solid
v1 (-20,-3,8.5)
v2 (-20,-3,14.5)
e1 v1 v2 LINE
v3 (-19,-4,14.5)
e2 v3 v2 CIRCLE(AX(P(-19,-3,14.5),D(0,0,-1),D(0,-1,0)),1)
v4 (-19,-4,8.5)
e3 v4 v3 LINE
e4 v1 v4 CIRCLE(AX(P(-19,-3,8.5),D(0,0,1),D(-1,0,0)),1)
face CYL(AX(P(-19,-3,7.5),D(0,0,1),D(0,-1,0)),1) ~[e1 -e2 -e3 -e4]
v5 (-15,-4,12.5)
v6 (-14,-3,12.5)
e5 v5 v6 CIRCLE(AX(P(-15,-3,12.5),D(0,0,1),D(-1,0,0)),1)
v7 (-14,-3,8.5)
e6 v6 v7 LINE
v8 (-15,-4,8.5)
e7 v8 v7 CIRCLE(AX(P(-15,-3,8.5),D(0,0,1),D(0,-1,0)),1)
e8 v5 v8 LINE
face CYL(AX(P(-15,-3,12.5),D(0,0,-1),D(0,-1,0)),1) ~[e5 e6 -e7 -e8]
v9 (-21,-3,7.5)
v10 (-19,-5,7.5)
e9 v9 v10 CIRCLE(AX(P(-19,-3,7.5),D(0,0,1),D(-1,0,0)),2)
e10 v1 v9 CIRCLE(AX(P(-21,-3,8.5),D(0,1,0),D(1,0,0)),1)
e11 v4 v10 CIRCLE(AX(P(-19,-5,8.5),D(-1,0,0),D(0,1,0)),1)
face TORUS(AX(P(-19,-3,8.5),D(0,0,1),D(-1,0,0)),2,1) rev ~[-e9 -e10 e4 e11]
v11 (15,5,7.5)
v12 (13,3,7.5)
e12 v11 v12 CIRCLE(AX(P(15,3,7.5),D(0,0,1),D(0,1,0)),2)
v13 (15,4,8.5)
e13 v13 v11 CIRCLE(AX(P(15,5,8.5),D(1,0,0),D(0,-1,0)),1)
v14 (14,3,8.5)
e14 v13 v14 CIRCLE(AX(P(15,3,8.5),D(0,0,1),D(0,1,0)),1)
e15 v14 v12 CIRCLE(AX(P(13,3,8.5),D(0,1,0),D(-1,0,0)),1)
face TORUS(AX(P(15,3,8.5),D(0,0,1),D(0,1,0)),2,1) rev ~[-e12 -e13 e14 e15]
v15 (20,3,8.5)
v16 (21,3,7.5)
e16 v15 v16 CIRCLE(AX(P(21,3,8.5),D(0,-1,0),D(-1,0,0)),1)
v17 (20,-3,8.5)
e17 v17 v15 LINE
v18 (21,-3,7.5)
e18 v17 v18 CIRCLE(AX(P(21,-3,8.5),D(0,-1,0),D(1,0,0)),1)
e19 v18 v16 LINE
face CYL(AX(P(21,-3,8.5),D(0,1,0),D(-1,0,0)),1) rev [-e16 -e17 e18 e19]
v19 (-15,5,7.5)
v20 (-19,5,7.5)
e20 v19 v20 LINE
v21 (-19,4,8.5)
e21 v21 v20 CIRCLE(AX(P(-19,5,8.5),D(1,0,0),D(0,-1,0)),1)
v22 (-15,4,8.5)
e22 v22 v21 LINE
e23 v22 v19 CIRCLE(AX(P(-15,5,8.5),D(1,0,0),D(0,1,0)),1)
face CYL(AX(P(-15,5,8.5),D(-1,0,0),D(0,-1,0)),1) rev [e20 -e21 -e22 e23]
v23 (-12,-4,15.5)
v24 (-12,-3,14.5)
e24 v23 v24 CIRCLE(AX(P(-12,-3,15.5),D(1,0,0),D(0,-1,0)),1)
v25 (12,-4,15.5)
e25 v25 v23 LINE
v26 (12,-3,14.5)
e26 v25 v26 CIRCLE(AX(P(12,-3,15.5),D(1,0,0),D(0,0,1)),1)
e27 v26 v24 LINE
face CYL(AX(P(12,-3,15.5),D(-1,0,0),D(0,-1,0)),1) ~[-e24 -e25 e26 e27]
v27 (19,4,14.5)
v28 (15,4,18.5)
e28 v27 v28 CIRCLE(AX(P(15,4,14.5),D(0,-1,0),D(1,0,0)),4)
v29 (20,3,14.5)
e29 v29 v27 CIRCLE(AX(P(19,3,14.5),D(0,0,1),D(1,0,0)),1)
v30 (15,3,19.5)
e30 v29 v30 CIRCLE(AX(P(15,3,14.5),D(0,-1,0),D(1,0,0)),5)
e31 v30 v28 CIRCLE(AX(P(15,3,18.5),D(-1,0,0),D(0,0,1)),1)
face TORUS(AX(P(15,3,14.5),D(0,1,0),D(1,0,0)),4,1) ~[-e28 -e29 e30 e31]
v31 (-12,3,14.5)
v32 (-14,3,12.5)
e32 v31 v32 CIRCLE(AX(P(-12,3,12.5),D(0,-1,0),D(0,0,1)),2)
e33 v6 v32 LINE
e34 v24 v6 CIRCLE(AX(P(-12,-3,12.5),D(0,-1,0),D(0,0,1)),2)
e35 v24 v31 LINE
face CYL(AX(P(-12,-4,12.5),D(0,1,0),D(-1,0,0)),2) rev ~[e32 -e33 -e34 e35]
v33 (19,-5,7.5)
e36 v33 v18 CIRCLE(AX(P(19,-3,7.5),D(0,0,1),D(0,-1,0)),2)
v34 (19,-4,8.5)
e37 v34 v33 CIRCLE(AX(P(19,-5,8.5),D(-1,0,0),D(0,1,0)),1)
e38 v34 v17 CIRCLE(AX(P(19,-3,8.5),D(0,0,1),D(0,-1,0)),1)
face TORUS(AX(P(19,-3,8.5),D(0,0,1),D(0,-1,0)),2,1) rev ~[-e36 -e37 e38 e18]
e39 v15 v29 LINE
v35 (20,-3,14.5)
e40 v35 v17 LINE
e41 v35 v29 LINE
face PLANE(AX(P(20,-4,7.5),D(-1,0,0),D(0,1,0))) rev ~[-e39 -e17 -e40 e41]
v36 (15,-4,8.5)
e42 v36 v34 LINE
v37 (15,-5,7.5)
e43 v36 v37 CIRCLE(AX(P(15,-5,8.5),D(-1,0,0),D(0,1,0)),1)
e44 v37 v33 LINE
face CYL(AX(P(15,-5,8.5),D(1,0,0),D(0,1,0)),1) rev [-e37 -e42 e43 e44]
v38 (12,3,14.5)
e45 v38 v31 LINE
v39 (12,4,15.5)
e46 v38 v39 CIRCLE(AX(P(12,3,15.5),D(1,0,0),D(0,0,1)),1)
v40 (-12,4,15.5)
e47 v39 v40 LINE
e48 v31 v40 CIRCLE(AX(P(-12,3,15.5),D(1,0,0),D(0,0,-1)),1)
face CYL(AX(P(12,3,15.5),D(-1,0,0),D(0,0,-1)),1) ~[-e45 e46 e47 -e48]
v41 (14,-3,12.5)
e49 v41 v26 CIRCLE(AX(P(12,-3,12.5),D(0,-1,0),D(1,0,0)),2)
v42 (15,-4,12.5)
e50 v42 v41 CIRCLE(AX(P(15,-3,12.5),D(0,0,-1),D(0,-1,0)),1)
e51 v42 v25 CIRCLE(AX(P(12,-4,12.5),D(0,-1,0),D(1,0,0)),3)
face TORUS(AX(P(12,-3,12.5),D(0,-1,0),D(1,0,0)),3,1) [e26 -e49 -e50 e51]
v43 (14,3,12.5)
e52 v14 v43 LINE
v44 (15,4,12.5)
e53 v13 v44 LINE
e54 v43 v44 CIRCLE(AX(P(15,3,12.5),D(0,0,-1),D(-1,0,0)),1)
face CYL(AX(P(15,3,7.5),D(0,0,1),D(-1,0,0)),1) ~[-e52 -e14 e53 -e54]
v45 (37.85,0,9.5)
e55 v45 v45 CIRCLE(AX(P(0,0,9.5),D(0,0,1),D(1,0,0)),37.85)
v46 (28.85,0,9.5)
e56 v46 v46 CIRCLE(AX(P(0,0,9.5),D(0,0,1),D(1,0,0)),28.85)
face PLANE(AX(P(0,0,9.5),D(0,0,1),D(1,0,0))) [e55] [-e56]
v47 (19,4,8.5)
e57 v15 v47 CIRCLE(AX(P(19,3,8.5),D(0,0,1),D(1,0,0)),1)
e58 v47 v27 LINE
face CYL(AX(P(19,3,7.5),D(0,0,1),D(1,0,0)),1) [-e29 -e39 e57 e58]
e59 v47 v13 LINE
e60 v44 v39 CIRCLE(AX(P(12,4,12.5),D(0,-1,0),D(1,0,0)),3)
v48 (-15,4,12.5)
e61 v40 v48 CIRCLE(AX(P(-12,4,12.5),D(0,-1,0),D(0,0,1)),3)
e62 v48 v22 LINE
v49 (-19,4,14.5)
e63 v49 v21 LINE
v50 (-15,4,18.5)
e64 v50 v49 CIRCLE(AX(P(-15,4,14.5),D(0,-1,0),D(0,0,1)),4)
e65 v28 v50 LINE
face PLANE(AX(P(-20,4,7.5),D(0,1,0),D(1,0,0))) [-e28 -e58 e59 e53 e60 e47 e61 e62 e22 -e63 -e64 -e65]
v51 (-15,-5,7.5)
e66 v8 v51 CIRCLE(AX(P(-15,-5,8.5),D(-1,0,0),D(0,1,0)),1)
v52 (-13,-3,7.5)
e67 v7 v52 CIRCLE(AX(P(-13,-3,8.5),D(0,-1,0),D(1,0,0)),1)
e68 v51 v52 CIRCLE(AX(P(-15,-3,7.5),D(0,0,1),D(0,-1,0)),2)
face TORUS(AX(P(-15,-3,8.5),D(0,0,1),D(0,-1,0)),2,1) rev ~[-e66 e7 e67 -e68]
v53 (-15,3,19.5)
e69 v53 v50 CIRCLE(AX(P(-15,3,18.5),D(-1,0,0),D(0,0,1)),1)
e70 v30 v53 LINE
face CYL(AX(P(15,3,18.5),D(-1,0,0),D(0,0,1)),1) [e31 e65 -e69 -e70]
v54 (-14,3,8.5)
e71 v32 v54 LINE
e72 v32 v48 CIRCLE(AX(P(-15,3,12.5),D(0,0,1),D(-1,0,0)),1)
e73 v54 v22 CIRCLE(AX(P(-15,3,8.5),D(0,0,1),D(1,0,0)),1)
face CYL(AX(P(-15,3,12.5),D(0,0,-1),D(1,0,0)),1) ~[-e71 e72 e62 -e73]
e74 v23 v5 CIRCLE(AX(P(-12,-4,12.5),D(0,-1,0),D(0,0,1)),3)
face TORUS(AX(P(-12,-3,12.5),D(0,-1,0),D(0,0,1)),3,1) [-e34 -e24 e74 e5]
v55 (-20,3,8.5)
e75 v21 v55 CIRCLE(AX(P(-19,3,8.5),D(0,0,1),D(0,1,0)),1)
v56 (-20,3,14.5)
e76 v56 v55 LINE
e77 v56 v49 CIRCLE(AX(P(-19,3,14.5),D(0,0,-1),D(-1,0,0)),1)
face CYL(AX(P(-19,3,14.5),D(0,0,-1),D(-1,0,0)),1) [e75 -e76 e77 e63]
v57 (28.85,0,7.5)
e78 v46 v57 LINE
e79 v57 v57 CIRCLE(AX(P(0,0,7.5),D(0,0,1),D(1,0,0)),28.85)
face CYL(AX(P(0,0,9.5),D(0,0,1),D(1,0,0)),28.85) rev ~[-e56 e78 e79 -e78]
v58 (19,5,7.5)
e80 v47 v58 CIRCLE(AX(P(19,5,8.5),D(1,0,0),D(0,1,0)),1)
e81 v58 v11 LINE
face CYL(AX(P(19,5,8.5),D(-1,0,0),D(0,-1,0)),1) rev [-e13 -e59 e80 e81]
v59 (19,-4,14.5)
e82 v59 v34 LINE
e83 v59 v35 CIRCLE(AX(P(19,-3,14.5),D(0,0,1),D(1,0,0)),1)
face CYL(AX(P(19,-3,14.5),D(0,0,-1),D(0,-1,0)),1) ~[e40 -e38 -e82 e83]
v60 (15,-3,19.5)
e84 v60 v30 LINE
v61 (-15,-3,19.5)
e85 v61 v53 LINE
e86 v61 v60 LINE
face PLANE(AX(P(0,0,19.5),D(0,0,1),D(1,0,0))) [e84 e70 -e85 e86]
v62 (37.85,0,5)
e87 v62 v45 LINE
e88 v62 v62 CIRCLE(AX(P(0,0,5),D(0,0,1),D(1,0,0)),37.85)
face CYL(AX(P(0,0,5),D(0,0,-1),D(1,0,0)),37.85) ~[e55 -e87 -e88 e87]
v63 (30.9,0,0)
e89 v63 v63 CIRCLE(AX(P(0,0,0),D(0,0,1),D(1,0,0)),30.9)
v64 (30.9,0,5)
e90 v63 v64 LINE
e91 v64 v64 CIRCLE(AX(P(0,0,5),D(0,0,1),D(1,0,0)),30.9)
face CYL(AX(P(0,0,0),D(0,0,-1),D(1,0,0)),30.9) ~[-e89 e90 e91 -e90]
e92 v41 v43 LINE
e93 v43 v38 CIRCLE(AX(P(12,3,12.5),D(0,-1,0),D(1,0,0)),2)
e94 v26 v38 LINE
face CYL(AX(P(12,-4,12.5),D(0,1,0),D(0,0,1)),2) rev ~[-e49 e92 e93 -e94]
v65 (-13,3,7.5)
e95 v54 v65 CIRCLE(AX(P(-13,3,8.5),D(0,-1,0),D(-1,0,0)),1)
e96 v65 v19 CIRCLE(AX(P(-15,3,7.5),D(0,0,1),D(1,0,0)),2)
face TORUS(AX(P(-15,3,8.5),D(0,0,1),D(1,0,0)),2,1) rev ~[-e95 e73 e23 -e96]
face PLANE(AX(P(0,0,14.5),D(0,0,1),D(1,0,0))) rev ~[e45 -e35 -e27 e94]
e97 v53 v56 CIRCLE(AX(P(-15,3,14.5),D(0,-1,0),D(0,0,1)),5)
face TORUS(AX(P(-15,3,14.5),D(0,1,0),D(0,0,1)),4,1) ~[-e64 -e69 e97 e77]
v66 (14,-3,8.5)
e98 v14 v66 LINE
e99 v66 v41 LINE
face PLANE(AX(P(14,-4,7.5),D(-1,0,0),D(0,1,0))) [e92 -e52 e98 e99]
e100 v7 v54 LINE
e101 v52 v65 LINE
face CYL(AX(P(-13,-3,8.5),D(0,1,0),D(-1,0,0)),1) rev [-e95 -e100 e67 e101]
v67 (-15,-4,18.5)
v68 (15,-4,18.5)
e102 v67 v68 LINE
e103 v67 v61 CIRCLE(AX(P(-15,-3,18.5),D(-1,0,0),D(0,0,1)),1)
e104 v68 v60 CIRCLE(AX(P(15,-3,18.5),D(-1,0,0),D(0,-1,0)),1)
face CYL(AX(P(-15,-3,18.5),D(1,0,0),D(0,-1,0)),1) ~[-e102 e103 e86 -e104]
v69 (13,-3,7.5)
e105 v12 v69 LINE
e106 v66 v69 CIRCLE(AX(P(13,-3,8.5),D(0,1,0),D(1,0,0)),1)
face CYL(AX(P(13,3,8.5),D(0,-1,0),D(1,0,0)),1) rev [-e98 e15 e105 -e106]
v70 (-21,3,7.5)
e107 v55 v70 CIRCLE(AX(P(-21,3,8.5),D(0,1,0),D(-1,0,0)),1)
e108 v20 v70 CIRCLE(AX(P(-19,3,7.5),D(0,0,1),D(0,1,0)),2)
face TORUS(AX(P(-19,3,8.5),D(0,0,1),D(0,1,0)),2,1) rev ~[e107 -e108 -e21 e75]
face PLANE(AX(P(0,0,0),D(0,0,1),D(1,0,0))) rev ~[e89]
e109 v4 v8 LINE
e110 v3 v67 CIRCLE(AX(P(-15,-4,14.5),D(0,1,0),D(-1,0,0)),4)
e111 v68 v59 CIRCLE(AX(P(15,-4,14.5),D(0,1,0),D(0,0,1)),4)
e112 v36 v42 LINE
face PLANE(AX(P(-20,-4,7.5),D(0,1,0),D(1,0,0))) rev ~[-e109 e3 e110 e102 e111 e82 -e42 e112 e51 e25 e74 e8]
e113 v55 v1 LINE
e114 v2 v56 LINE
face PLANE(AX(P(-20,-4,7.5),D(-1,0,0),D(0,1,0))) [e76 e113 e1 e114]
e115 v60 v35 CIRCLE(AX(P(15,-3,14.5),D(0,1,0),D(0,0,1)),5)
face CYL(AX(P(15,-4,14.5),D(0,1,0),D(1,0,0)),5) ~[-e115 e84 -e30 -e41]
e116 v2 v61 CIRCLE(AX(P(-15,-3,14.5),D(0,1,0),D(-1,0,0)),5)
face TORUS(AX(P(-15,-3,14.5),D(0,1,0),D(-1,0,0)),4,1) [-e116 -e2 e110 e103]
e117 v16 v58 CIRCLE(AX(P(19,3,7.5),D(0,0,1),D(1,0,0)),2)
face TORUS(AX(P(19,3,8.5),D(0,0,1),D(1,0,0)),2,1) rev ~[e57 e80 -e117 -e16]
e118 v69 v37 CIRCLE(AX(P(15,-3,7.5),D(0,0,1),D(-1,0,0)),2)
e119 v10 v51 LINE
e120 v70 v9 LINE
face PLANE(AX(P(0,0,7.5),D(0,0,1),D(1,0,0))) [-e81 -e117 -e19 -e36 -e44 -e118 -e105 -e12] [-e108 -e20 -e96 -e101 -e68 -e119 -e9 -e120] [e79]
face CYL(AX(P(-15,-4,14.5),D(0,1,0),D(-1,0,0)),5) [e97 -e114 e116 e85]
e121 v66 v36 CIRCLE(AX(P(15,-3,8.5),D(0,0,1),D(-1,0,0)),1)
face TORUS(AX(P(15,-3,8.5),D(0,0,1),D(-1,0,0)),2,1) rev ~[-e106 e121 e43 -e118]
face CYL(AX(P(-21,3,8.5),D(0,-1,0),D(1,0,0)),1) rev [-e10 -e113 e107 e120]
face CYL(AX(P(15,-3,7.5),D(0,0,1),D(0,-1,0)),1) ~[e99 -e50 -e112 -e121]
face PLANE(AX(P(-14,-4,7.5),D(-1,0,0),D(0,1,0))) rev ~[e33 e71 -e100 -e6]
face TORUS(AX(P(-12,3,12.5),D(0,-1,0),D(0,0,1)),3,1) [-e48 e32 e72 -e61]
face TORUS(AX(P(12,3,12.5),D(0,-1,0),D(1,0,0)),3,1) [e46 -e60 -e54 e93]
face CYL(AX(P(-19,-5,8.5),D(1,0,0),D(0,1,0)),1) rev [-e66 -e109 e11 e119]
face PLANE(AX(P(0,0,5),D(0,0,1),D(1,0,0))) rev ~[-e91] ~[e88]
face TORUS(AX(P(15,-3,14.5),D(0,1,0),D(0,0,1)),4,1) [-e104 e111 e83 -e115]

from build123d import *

# Parameters (mm, degrees)
F1_R      = 30.9
F2_DEPTH  = 5
F3_R      = 37.85
F4_DEPTH  = 4.5
F5_R      = 28.85
F6_DEPTH  = 2
F7_W      = 40
F7_H      = 8
F9_DEPTH  = 12
F10_R     = 5
F8_W      = 28
F8_H      = 8
F11_DEPTH = 7
F12_R     = 2
F13_F1_R  = 1
F13_F2_R  = 1


with BuildPart() as f2:
    # F1 (on offset) → F2 (new body)
    with BuildSketch(Plane.XY):
        Circle(F1_R)
    extrude(amount=F2_DEPTH)

    # F3 (on face) → F4 (join)
    with BuildSketch(Plane.XY.offset(5)):
        Circle(F3_R)
    extrude(amount=F4_DEPTH)

    # F5 (on face) → F6 (cut)
    with BuildSketch(Plane.XY.offset(9.5)):
        Circle(F5_R)
    extrude(amount=-F6_DEPTH, mode=Mode.SUBTRACT)

    # F7 (on face) → F9 (join)
    with BuildSketch(Plane.XY.offset(7.5)):
        Rectangle(F7_W, F7_H)
    extrude(amount=F9_DEPTH)

    # F10
    f10_edges = [f2.edges().sort_by_distance(p)[0] for p in [
        (-20, 0, 19.5),
        (20, 0, 19.5),
    ]]
    fillet(f10_edges, radius=F10_R)

    # F8 (on face) → F11 (cut)
    with BuildSketch(Plane.XY.offset(7.5)):
        Rectangle(F8_W, F8_H)
    extrude(amount=F11_DEPTH, mode=Mode.SUBTRACT)

    # F12
    f12_edges = [f2.edges().sort_by_distance(p)[0] for p in [
        (-14, 0, 14.5),
        (14, 0, 14.5),
    ]]
    fillet(f12_edges, radius=F12_R)

    # F13: fillet of radius 1 on 24 edges, made by hand

    # F13_f1
    f13_f1_edges = [f2.edges().sort_by_distance(p)[0] for p in [
        (0, -4, 19.5),
        (14, -4, 10),
        (13.4142135624, -4, 13.9142135624),
        (0, -4, 14.5),
        (-13.4142135624, -4, 13.9142135624),
        (-14, -4, 10),
        (-20, -4, 11),
        (-18.5355339059, -4, 18.0355339059),
        (18.5355339059, -4, 18.0355339059),
        (20, -4, 11),
        (14, 4, 10),
        (13.4142135624, 4, 13.9142135624),
        (0, 4, 14.5),
        (20, 4, 11),
        (-13.4142135624, 4, 13.9142135624),
        (18.5355339059, 4, 18.0355339059),
        (-14, 4, 10),
        (0, 4, 19.5),
        (-18.5355339059, 4, 18.0355339059),
        (-20, 4, 11),
    ]]
    fillet(f13_f1_edges, radius=F13_F1_R)

    # F13_f2
    f13_f2_edges = [f2.edges().sort_by_distance(p)[0] for p in [
        (-17, -4, 7.5),
        (17, -4, 7.5),
        (17, 4, 7.5),
        (-17, 4, 7.5),
        (-14.2928932188, 3.7071067812, 7.5),
        (-19.7071067812, 3.7071067812, 7.5),
        (19.7071067812, 3.7071067812, 7.5),
        (14.2928932188, 3.7071067812, 7.5),
        (14.2928932188, -3.7071067812, 7.5),
        (19.7071067812, -3.7071067812, 7.5),
        (-19.7071067812, -3.7071067812, 7.5),
        (-14.2928932188, -3.7071067812, 7.5),
    ]]
    fillet(f13_f2_edges, radius=F13_F2_R)


solid = f2.part
